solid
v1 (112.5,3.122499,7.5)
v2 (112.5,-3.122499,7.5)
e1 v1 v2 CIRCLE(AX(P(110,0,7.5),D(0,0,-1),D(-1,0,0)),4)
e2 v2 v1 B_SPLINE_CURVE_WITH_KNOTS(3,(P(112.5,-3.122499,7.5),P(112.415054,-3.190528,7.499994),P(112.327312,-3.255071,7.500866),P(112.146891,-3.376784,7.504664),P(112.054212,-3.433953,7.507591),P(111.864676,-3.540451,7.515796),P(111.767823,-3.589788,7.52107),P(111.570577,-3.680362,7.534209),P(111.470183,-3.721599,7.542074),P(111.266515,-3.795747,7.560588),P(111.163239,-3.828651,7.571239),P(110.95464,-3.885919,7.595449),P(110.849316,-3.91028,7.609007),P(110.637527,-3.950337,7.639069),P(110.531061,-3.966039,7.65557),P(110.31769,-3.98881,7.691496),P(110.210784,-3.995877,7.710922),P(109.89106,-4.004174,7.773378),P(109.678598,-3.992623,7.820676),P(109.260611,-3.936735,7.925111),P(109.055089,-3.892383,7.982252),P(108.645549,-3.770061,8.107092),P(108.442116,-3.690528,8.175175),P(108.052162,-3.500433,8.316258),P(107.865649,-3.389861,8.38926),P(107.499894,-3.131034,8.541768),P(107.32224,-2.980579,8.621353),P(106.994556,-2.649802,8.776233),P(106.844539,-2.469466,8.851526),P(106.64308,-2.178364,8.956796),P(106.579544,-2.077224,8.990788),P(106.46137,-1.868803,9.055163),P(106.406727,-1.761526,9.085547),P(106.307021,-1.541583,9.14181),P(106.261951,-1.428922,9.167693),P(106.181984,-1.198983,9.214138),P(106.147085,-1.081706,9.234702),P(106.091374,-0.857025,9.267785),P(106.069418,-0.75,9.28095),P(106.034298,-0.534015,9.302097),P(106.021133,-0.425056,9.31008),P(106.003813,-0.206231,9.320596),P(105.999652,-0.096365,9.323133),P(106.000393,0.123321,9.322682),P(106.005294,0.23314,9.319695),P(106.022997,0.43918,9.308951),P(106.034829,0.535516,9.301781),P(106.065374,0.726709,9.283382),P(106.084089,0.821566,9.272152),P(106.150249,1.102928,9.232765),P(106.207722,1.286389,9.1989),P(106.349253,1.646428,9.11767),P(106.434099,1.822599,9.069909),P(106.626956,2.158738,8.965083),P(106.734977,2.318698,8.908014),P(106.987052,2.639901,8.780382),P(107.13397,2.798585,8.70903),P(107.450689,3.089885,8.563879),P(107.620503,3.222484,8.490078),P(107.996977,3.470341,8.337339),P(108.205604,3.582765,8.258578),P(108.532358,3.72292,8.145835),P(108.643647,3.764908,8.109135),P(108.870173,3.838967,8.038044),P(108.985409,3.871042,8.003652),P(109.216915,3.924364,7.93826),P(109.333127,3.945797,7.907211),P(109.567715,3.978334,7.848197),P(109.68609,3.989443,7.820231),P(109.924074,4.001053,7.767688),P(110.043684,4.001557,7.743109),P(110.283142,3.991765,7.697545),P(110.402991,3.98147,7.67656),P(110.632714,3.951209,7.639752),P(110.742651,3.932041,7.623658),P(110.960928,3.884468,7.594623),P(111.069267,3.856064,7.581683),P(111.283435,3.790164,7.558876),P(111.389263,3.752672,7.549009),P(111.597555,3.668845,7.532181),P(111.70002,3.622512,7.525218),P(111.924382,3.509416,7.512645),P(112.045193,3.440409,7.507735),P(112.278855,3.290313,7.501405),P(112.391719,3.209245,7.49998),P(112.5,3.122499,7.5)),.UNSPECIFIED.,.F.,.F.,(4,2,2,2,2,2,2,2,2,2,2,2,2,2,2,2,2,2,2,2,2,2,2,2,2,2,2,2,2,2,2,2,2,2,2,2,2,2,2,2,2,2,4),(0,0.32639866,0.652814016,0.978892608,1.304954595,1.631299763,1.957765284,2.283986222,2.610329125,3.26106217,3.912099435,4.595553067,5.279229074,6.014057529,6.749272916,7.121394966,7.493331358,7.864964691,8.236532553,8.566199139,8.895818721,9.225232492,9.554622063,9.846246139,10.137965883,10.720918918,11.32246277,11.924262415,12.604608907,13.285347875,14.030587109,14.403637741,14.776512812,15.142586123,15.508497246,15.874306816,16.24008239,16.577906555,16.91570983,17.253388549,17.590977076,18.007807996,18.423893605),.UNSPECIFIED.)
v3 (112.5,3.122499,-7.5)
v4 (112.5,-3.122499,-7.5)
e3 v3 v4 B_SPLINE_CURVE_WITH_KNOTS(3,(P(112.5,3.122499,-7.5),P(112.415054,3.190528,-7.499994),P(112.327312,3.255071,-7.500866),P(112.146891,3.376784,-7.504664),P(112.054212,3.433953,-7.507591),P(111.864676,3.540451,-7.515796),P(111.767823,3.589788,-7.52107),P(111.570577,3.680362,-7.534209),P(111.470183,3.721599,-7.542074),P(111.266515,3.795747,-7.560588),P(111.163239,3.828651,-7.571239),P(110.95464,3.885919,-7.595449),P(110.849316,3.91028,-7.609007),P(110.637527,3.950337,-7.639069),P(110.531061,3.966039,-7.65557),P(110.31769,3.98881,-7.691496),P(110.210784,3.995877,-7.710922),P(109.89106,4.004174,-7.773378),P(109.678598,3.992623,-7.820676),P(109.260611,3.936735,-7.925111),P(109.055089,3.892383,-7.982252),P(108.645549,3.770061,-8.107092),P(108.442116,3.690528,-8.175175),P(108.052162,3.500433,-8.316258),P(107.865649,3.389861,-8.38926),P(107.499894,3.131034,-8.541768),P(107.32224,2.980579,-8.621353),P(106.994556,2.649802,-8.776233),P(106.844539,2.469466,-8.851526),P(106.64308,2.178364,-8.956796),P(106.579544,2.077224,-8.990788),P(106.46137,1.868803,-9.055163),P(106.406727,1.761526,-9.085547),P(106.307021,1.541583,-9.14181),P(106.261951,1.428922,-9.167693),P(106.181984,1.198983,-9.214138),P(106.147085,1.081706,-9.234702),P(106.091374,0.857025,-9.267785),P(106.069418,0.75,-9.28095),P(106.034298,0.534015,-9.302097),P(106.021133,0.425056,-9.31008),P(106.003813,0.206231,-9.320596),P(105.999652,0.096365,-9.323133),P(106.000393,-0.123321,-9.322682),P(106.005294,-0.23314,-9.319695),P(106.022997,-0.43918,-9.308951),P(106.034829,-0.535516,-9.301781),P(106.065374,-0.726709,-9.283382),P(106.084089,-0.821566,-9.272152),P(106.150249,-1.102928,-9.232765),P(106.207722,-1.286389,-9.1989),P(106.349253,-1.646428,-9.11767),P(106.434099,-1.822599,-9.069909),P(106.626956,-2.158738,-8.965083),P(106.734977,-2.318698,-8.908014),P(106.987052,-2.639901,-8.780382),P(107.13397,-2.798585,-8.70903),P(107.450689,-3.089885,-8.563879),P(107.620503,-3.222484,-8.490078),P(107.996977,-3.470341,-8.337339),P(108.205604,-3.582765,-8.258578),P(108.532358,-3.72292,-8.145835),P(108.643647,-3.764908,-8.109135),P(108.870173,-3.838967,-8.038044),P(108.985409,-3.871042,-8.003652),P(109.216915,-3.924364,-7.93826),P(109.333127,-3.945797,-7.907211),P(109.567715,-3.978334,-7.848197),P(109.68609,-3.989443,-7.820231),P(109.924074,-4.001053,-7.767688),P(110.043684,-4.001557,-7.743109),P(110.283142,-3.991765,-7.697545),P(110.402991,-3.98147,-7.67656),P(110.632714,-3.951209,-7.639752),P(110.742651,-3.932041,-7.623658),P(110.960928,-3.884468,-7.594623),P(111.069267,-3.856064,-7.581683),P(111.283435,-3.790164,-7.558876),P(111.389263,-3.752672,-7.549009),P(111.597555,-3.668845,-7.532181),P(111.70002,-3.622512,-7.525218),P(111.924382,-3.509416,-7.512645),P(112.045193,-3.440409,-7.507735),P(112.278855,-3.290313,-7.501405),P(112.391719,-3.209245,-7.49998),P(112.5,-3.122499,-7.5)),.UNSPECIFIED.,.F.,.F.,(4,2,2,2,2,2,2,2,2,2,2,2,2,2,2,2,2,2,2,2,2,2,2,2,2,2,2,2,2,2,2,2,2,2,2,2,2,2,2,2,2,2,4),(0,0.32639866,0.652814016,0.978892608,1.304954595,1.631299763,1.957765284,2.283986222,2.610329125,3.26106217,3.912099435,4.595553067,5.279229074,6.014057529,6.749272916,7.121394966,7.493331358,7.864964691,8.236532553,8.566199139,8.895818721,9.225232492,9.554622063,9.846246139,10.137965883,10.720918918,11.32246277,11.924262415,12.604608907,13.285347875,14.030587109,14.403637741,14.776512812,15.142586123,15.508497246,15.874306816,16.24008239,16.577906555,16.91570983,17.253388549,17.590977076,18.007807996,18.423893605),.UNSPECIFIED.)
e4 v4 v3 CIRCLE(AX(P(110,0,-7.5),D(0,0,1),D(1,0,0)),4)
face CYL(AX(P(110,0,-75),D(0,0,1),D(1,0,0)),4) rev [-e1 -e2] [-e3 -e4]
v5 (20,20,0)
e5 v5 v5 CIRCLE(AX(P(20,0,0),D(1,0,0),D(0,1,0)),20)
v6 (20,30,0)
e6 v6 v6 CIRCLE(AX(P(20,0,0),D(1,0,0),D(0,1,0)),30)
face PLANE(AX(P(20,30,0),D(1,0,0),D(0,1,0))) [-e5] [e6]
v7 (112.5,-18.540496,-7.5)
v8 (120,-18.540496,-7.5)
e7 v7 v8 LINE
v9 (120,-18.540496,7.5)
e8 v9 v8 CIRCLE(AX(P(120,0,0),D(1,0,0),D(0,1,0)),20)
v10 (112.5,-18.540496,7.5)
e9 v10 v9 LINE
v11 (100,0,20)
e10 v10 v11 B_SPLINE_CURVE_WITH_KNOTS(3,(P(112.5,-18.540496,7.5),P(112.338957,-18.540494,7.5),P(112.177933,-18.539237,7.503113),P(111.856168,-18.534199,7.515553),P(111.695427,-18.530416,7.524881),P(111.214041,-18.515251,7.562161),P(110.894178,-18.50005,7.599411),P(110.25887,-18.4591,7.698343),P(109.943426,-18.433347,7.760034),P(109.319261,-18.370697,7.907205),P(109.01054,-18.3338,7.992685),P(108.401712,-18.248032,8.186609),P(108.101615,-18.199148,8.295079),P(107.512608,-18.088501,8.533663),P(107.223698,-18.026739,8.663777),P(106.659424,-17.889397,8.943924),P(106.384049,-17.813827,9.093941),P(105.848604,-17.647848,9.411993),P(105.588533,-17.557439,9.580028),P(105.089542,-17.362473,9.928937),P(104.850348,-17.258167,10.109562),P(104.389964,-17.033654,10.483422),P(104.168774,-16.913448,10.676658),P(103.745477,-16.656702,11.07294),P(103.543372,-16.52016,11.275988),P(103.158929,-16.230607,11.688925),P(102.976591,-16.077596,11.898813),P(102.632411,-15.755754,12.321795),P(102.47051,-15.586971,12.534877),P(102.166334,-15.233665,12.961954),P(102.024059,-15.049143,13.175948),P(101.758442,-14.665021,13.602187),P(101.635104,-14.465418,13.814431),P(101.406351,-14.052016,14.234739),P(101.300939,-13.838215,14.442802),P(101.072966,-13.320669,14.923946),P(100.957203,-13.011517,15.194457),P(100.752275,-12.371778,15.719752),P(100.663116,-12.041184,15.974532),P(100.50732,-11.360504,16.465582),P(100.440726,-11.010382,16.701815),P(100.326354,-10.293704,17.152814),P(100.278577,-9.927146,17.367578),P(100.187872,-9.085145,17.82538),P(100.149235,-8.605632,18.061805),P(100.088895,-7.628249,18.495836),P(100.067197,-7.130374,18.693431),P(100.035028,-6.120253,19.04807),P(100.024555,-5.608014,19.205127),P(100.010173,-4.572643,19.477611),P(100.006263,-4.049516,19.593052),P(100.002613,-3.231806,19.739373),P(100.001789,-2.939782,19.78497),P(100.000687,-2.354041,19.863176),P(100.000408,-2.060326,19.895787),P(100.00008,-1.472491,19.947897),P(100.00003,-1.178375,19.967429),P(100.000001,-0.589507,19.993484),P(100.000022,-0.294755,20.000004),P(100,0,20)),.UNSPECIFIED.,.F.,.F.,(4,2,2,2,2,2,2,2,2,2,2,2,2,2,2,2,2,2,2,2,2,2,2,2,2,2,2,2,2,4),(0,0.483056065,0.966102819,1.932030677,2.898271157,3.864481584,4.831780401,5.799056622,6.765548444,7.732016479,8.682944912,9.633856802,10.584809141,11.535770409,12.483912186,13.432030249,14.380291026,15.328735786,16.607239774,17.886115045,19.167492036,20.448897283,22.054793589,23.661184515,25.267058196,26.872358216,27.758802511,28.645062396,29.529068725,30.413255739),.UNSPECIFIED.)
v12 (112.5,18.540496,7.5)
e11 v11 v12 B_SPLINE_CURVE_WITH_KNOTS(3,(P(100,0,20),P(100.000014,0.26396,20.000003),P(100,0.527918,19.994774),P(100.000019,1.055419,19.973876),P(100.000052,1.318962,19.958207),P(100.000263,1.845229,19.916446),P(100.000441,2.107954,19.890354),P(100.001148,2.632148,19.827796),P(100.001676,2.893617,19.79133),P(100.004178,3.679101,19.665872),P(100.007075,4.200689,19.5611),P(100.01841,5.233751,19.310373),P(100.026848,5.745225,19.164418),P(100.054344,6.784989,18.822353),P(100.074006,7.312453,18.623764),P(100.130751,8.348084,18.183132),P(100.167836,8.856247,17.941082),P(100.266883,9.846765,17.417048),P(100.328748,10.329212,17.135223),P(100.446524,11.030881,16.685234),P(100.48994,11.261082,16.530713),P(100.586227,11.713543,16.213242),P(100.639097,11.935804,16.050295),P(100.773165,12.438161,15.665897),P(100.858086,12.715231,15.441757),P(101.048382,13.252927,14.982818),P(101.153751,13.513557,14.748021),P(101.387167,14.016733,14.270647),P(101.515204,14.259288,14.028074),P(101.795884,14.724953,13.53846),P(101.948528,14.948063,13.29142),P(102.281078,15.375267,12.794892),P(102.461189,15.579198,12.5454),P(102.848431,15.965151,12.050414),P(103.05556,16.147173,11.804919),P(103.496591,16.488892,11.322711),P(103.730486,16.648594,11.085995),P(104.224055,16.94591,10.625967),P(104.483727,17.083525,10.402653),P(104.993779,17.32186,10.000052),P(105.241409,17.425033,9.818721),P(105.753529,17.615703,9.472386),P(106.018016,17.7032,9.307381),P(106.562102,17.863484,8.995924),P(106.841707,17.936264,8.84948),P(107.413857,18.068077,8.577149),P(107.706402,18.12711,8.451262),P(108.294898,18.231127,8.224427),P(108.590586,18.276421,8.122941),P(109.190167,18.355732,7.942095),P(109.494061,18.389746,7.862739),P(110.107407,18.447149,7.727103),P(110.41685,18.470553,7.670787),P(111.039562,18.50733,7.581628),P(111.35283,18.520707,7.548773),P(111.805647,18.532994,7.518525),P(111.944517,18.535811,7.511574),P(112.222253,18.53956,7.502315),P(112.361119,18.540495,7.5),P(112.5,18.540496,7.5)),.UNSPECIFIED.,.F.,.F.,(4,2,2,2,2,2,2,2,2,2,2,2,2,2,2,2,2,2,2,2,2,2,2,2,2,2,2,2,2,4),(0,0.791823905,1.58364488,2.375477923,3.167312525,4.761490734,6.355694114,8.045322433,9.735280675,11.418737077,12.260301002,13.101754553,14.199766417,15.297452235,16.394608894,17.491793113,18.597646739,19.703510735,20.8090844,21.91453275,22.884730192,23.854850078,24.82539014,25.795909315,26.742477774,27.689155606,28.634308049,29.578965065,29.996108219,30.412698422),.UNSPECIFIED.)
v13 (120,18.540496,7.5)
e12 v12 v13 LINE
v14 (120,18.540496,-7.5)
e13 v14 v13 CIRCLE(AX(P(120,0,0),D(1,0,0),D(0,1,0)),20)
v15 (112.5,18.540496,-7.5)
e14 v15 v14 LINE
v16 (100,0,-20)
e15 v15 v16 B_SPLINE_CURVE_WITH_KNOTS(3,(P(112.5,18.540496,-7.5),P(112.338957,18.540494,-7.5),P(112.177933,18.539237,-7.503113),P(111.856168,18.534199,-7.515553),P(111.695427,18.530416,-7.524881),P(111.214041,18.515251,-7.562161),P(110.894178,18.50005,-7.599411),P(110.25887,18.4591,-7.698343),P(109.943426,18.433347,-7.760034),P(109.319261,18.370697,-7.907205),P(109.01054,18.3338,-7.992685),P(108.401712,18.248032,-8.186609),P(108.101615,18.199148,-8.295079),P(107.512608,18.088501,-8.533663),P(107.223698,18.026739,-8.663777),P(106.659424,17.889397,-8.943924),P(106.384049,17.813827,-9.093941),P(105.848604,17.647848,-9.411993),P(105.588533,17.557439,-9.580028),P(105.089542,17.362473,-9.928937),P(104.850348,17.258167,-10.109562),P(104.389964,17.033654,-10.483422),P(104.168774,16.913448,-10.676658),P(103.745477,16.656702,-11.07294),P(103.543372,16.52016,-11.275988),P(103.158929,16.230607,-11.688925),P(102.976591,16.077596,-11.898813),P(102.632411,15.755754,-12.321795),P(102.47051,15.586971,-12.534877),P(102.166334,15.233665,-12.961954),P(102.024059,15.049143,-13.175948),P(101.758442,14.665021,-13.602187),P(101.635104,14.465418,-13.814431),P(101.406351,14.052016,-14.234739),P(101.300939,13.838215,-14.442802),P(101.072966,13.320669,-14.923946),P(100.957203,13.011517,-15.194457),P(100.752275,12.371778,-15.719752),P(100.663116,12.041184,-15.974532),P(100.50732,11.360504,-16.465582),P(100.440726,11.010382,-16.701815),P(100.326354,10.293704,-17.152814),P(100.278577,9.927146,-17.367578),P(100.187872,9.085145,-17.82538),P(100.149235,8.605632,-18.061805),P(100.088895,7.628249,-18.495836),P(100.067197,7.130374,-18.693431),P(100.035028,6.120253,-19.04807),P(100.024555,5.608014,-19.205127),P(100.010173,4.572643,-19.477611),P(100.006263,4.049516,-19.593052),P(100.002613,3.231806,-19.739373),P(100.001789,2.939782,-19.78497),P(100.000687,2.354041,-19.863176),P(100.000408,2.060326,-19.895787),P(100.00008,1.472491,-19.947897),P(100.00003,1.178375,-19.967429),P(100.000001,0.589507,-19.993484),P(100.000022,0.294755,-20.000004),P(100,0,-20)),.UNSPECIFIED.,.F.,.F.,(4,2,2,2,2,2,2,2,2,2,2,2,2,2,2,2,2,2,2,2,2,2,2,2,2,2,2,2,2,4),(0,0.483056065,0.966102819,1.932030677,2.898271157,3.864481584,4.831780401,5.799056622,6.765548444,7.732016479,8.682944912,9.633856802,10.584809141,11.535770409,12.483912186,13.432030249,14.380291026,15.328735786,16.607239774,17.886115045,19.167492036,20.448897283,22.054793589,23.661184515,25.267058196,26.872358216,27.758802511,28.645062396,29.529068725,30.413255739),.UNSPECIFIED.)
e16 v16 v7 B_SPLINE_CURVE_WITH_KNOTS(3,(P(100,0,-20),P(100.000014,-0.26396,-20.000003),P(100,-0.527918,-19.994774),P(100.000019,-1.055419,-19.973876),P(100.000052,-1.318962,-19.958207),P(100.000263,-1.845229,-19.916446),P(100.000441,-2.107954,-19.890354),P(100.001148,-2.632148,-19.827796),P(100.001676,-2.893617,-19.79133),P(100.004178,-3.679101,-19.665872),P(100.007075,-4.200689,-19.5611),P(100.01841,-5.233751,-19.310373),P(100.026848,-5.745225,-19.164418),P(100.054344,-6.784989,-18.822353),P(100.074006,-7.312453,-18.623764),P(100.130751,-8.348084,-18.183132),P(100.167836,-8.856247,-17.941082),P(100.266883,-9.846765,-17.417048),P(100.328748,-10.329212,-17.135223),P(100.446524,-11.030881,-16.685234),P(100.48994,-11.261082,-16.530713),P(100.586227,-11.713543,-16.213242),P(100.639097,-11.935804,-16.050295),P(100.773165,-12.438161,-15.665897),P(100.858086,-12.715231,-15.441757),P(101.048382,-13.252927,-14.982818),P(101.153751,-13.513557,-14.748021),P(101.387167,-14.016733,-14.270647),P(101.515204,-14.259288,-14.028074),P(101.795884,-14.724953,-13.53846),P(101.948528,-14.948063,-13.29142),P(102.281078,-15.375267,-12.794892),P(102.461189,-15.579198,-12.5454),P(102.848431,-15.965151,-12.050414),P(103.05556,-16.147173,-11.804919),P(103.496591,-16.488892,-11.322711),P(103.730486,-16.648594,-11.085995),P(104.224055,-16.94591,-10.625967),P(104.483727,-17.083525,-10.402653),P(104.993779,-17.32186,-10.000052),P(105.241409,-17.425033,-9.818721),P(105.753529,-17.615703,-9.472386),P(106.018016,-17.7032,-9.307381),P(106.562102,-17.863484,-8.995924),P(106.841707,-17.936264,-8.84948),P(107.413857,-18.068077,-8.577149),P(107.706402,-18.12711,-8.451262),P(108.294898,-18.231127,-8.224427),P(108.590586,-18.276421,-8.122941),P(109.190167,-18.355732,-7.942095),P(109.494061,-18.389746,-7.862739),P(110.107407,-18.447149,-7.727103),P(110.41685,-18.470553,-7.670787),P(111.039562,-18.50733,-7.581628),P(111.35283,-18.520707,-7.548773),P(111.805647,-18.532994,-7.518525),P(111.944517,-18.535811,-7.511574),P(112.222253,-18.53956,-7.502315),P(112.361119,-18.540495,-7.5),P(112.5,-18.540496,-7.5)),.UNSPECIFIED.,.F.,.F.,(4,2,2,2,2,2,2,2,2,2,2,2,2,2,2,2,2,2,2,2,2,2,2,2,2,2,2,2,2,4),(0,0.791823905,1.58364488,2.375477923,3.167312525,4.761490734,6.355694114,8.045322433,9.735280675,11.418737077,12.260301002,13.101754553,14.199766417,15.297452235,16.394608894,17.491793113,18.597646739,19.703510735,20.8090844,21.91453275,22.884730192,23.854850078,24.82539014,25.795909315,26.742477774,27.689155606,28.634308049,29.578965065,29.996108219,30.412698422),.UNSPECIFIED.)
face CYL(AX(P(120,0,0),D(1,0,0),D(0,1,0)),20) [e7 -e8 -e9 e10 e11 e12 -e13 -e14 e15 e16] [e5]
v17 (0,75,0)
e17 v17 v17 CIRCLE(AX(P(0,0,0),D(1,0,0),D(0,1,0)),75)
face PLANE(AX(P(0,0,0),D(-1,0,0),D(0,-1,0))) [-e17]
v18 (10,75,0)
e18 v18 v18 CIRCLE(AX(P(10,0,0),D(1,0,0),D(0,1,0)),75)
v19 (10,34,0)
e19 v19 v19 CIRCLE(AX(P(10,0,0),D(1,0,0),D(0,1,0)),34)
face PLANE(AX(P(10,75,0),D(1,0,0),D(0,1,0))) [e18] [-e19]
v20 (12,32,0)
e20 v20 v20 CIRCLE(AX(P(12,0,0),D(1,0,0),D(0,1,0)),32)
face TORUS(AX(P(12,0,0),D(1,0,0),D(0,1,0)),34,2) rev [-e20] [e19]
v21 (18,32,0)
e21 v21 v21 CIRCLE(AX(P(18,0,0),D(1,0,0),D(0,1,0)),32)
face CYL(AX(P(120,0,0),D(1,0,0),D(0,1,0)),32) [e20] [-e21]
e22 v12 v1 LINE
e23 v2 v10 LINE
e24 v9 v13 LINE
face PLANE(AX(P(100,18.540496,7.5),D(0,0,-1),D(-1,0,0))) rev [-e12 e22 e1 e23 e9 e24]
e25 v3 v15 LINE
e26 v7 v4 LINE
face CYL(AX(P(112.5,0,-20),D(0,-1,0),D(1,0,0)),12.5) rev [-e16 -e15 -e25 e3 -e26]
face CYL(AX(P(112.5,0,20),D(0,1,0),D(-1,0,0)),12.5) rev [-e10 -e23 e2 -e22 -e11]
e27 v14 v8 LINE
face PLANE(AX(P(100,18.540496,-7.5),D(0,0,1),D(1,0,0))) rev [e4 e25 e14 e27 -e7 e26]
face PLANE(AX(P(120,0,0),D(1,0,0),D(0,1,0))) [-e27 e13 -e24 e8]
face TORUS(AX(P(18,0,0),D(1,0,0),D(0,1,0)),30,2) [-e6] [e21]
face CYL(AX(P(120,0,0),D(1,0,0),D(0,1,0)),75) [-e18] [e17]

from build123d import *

# Parameters (mm, degrees)
CUT_EXTRUDE1_DEPTH      = 20
FILLET1_R               = 12.5
CUT_EXTRUDE2_DEPTH      = 164.802472582
CUT_EXTRUDE2_DEPTH_BACK = 164.802472582
SKETCH3_R               = 4


with BuildPart() as part:
    # Sketch1 → Revolve1 (revolve)
    with BuildSketch(Plane.XY):
        with BuildLine():
            Line((0, 0), (0, 75))
            Line((0, 75), (10, 75))
            Line((10, 75), (10, 34))
            ThreePointArc((10, 34), (10.585786438, 32.585786438), (12, 32))
            Line((12, 32), (18, 32))
            ThreePointArc((18, 32), (19.414213562, 31.414213562), (20, 30))
            Line((20, 30), (20, 20))
            Line((20, 20), (120, 20))
            Line((120, 20), (120, 0))
            Line((120, 0), (10, 0))
            Line((10, 0), (0, 0))
        make_face()
    revolve(axis=Axis((120, 0, 0), (-1, 0, 0)))

    # Sketch2 → Cut-Extrude1 (cut)
    with BuildSketch(Plane(origin=(120, 0, 0), x_dir=(0, 0, -1), z_dir=(1, 0, 0))):
        with BuildLine():
            Line((-7.5, 18.540496218), (-7.5, -18.540496218))
            ThreePointArc((-7.5, -18.540496218), (-20, 0), (-7.5, 18.540496218))
        make_face()
        with BuildLine():
            Line((7.5, 18.540496218), (7.5, -18.540496218))
            ThreePointArc((7.5, -18.540496218), (20, 0), (7.5, 18.540496218))
        make_face()
    extrude(amount=-CUT_EXTRUDE1_DEPTH, mode=Mode.SUBTRACT)

    # Fillet1
    fillet1_edges = [part.edges().sort_by_distance(p)[0] for p in [
        (100, 0, -7.5),
        (100, 0, 7.5),
    ]]
    fillet(fillet1_edges, radius=FILLET1_R - 0.0001)  # a hair under: the kernel refuses the full size

    # Sketch3 → Cut-Extrude2 (cut, two sides: drawn at the far end of the back side and taken through both)
    with BuildSketch(Plane.XY.offset(7.5).offset(-CUT_EXTRUDE2_DEPTH_BACK)):
        with Locations(Location((110, 0, 0), (0, 0, 308.682187453))):
            Circle(SKETCH3_R)
    extrude(amount=CUT_EXTRUDE2_DEPTH + CUT_EXTRUDE2_DEPTH_BACK, mode=Mode.SUBTRACT)


solid = part.part
